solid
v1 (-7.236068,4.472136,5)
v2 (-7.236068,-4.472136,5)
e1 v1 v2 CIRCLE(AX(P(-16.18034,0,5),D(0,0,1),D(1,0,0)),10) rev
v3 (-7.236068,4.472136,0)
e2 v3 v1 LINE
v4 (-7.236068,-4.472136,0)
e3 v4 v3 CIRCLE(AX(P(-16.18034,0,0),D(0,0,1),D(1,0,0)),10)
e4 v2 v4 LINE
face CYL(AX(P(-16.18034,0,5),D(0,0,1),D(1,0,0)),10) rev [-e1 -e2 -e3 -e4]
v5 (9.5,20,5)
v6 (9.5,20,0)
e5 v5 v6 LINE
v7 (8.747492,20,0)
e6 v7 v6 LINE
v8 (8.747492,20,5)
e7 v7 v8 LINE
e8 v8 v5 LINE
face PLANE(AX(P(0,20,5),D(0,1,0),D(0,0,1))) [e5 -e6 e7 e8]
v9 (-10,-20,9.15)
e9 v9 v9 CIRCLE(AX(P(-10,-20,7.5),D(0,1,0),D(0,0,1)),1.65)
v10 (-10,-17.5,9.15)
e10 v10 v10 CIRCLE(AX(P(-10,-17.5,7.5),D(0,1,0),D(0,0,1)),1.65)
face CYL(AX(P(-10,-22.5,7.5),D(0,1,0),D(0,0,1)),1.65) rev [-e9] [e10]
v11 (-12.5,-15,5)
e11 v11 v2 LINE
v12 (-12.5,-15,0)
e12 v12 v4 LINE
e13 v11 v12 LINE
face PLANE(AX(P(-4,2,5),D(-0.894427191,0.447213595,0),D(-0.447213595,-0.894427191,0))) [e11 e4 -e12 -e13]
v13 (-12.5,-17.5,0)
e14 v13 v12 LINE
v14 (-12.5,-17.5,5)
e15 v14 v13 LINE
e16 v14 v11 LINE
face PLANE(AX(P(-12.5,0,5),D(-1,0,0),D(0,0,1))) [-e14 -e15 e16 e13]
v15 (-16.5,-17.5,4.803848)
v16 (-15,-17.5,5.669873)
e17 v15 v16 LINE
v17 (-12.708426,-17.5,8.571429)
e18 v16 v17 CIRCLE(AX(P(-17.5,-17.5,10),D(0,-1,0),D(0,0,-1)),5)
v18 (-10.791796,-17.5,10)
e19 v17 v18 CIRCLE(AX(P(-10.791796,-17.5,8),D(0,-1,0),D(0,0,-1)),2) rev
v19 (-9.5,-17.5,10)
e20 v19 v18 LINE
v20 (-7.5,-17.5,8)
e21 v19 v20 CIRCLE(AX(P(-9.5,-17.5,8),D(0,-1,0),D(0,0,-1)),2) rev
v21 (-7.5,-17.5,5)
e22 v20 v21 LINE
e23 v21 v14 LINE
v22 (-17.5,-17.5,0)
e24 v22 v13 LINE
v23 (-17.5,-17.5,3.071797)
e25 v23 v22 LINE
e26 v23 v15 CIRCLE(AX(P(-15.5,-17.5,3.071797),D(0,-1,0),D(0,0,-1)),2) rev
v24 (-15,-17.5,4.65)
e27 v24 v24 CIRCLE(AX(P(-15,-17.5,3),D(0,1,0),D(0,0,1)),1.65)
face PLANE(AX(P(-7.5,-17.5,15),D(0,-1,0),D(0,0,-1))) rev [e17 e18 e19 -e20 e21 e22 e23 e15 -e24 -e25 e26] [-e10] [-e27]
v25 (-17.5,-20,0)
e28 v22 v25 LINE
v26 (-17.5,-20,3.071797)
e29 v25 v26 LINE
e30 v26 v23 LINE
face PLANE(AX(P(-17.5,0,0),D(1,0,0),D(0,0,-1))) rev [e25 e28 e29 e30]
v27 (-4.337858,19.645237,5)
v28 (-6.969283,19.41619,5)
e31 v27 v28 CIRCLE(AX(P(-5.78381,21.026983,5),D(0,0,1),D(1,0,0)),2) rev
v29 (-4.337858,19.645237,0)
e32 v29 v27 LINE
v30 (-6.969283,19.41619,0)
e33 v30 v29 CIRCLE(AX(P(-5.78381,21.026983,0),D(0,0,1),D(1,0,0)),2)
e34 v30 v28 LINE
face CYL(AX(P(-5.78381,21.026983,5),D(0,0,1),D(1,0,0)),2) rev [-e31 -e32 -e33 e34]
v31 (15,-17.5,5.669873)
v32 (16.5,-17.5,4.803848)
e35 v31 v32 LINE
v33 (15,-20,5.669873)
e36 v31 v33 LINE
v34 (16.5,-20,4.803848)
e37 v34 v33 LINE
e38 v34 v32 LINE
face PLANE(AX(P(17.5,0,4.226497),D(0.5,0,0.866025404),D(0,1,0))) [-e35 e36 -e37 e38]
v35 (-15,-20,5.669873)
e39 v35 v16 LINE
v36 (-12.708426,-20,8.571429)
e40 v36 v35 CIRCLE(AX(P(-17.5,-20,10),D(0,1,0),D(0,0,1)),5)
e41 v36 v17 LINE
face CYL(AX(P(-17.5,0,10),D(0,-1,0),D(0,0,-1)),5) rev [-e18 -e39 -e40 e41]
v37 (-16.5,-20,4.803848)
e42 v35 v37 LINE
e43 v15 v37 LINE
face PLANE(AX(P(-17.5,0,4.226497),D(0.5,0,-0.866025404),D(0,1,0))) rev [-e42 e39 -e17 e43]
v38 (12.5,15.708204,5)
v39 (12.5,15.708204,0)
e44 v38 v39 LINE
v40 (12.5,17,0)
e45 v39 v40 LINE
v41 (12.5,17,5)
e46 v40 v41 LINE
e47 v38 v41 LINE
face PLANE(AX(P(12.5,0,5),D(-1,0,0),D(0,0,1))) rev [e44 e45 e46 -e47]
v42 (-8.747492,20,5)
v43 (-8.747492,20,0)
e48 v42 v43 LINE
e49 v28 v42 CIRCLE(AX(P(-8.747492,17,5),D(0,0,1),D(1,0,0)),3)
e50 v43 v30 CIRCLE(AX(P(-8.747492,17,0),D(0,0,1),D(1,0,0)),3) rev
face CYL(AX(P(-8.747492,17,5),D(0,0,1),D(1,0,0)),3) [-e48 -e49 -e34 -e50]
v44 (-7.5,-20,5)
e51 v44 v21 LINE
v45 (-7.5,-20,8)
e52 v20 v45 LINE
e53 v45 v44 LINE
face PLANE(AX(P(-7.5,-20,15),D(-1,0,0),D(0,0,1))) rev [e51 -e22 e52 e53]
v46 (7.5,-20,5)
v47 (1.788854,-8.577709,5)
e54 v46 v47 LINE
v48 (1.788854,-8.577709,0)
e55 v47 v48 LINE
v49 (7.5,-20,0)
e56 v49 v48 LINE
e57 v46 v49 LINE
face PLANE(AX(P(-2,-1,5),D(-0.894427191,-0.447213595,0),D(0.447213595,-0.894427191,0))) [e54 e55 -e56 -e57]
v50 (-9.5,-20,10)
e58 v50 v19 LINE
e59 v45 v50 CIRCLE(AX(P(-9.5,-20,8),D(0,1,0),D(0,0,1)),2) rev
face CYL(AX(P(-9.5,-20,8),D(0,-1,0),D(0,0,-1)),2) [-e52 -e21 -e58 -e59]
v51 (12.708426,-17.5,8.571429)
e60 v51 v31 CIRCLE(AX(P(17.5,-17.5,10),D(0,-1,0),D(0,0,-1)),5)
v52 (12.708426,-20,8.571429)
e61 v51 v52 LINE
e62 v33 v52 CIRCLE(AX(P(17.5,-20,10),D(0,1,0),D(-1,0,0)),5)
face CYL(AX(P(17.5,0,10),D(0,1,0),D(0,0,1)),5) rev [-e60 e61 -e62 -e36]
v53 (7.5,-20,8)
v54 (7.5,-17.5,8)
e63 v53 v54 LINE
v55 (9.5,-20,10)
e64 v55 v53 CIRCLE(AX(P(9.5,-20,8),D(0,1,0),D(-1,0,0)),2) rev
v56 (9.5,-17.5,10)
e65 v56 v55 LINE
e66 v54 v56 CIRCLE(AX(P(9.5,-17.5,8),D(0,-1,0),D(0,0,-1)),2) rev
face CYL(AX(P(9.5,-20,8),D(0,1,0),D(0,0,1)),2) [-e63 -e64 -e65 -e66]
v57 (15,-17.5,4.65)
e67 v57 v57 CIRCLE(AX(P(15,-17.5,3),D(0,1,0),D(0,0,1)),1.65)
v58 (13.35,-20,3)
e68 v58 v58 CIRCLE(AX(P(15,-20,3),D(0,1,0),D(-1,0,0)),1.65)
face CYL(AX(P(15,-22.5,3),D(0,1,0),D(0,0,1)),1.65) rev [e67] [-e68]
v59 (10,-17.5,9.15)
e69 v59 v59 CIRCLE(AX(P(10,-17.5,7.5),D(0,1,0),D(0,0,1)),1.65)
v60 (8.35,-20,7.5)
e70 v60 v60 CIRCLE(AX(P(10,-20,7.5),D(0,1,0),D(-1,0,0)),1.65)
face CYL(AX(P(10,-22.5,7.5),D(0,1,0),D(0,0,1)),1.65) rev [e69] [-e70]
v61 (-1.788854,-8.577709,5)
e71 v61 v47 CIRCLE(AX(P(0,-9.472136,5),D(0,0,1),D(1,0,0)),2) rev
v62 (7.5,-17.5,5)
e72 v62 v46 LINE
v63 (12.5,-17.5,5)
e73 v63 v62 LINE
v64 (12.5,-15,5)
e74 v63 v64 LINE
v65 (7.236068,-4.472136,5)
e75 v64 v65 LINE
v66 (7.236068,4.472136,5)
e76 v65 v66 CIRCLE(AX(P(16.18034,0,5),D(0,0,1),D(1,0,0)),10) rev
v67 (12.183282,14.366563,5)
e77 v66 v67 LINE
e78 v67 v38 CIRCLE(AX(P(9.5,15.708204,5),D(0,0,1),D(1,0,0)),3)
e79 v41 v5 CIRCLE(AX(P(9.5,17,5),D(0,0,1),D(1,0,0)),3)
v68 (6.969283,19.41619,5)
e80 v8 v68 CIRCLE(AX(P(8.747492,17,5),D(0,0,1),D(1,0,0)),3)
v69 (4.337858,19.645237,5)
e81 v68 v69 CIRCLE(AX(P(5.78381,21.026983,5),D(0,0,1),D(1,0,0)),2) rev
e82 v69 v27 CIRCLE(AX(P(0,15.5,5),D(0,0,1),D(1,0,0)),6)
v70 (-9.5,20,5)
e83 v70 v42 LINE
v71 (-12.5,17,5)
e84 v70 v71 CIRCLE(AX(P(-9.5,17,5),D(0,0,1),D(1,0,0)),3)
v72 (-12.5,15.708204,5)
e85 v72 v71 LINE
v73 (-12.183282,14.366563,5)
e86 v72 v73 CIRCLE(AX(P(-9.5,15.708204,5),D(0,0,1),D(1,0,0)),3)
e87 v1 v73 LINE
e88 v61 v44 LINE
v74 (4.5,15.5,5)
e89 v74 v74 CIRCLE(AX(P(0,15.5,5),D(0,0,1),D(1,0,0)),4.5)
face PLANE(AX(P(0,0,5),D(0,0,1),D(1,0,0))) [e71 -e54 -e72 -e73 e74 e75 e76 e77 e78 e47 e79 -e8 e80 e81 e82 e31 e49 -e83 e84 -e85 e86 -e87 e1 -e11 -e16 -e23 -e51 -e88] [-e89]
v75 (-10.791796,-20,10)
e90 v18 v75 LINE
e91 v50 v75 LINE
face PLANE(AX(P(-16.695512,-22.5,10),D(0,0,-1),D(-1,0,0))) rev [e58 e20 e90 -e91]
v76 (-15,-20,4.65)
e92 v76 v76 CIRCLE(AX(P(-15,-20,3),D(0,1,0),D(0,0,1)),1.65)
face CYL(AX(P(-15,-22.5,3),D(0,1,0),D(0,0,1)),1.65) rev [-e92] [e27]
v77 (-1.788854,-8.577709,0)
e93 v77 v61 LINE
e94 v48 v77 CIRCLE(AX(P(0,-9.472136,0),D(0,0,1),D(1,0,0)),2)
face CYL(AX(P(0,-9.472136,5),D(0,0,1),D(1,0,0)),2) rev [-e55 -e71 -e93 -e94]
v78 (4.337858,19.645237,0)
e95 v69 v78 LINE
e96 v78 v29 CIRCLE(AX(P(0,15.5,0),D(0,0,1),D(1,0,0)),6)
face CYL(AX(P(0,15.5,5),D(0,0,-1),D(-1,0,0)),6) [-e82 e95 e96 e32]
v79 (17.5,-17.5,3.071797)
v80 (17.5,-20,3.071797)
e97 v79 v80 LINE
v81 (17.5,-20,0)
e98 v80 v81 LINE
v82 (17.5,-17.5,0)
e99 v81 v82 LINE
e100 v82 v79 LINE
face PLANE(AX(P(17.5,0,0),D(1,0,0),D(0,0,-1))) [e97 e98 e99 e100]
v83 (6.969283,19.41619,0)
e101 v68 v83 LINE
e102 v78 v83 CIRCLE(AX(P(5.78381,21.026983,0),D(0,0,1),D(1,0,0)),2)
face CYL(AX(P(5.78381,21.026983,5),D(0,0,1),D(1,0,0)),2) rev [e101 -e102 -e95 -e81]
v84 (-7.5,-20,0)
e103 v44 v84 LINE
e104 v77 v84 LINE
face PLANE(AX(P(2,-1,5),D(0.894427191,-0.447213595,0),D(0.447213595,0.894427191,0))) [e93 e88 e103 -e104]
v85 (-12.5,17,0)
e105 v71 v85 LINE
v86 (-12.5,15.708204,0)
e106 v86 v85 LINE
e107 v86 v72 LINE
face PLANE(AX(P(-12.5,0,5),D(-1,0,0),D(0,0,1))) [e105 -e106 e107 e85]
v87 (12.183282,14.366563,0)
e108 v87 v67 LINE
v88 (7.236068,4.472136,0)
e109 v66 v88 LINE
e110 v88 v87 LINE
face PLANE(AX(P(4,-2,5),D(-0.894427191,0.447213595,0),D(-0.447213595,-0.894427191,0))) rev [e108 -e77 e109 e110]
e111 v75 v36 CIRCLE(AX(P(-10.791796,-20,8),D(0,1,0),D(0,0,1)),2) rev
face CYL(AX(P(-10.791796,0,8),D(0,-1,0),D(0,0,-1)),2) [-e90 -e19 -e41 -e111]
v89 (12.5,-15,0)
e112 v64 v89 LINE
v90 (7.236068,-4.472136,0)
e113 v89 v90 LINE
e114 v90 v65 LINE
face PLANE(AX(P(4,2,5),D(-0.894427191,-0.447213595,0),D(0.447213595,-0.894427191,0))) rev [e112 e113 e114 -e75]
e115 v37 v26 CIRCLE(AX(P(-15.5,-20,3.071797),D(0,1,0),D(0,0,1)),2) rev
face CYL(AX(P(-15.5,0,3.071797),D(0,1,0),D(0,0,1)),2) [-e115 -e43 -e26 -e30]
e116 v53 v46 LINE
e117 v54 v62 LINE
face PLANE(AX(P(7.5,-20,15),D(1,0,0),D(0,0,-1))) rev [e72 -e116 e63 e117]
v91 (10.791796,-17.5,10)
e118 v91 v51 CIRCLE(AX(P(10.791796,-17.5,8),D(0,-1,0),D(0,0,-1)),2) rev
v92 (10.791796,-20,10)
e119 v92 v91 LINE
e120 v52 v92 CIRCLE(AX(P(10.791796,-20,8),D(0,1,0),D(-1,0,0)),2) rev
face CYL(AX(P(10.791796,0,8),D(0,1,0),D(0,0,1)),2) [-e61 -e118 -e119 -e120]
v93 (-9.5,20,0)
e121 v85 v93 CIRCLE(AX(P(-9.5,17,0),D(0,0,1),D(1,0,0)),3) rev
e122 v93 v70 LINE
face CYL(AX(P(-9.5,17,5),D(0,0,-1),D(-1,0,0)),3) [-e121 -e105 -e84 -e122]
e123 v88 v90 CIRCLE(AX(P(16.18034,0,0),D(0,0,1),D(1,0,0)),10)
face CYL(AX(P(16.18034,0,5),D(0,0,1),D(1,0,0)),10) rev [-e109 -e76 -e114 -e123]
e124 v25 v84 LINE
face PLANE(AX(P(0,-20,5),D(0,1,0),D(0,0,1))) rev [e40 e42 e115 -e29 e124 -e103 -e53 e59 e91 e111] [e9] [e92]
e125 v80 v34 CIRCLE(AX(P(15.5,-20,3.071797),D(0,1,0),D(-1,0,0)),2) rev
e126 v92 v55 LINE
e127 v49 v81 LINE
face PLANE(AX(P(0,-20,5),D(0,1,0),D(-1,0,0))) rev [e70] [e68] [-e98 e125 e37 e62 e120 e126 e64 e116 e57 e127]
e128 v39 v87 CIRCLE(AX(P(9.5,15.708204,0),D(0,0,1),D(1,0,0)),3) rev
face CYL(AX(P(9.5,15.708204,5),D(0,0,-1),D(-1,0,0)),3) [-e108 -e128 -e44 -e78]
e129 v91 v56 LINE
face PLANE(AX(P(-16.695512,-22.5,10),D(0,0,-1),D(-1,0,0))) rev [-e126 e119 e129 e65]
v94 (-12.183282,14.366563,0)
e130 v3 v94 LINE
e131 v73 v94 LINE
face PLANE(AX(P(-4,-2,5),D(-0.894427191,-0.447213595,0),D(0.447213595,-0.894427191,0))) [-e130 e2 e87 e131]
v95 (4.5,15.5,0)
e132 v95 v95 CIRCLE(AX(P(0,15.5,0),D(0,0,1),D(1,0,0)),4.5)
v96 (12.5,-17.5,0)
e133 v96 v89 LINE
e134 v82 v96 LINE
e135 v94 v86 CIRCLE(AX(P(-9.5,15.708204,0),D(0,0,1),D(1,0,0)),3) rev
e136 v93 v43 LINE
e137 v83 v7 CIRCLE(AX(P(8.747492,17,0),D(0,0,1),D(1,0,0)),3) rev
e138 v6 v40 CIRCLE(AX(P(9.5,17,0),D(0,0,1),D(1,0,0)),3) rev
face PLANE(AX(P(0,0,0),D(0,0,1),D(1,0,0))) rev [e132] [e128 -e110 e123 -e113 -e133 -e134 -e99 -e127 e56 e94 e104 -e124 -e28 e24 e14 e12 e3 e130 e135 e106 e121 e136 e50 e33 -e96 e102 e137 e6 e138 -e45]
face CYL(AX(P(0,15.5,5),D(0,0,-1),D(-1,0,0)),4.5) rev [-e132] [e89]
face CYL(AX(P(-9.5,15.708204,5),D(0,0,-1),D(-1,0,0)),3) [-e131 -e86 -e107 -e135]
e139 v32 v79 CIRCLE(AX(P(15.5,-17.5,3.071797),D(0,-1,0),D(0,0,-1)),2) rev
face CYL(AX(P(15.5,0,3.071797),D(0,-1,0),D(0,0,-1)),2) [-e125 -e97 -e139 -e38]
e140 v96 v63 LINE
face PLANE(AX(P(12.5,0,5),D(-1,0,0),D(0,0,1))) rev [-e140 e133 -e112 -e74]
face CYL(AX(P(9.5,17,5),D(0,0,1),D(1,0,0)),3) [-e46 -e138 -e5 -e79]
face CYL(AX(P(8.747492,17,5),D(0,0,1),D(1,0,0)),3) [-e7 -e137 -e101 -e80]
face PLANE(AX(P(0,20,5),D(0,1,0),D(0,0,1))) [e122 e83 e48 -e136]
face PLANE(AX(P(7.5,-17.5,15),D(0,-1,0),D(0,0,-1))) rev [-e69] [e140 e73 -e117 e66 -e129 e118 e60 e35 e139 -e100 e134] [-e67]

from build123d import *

# Parameters (mm, degrees)
SKETCH1_R           = 4.5
BOSS_EXTRUDE2_DEPTH = 5
SKETCH2_W           = 5
SKETCH2_H           = 2.5
BOSS_EXTRUDE3_DEPTH = 10
SKETCH3_W           = 10
SKETCH3_H           = 2.5
BOSS_EXTRUDE4_DEPTH = 5
SKETCH4_W           = 10
SKETCH4_H           = 2.5
BOSS_EXTRUDE5_DEPTH = 5
SKETCH5_R           = 1.65
CUT_EXTRUDE1_DEPTH  = 5
CHAMFER1_SIZE       = 5.773502692
CHAMFER1_SIZE_2     = 10
FILLET1_R           = 2
FILLET2_R           = 5
FILLET3_R           = 2
FILLET4_R           = 2
FILLET5_R           = 10
FILLET6_R           = 3
SKETCH6_R           = 1.65
SKETCH6_W           = 36.073404507
SKETCH6_H           = 7.954648173
CUT_EXTRUDE2_DEPTH  = 5
FILLET10_R          = 2


with BuildPart() as part:
    # Sketch1 → Boss-Extrude2 (new body)
    with BuildSketch(Plane.XY):
        with BuildLine():
            Line((-7.5, 20), (-5.870329309, 16.740658618))
            ThreePointArc((-5.870329309, 16.740658618), (0, 21.5), (5.870329309, 16.740658618))
            Line((5.870329309, 16.740658618), (7.5, 20))
            Line((7.5, 20), (12.5, 20))
            Line((12.5, 20), (12.5, 15))
            Line((12.5, 15), (5, 0))
            Line((5, 0), (12.5, -15))
            Line((12.5, -15), (12.5, -20))
            Line((12.5, -20), (7.5, -20))
            Line((7.5, -20), (0, -5))
            Line((0, -5), (-7.5, -20))
            Line((-7.5, -20), (-12.5, -20))
            Line((-12.5, -20), (-12.5, -15))
            Line((-12.5, -15), (-5, 0))
            Line((-5, 0), (-12.5, 15))
            Line((-12.5, 15), (-12.5, 20))
            Line((-12.5, 20), (-7.5, 20))
        make_face()
        with Locations((0, 15.5)):
            Circle(SKETCH1_R, mode=Mode.SUBTRACT)
    extrude(amount=BOSS_EXTRUDE2_DEPTH)

    # Sketch2 → Boss-Extrude3 (add)
    with BuildSketch(Plane.XY.offset(5)):
        with Locations((-10, -18.75)):
            Rectangle(SKETCH2_W, SKETCH2_H)
        with Locations((10, -18.75)):
            Rectangle(SKETCH2_W, SKETCH2_H)
    extrude(amount=BOSS_EXTRUDE3_DEPTH)

    # Sketch3 → Boss-Extrude4 (add)
    with BuildSketch(Plane(origin=(12.5, 0, 0), x_dir=(0, 0, -1), z_dir=(1, 0, 0))):
        with Locations((-5, -18.75)):
            Rectangle(SKETCH3_W, SKETCH3_H)
    extrude(amount=BOSS_EXTRUDE4_DEPTH)

    # Sketch4 → Boss-Extrude5 (add)
    with BuildSketch(Plane.ZY.offset(12.5)):
        with Locations((5, -18.75)):
            Rectangle(SKETCH4_W, SKETCH4_H)
    extrude(amount=BOSS_EXTRUDE5_DEPTH)

    # Sketch5 → Cut-Extrude1 (cut)
    with BuildSketch(Plane(origin=(0, -17.5, 0), x_dir=(1, 0, 0), z_dir=(0, 1, 0))):
        with Locations(Location((-15, -3, 0), (0, 0, 270))):
            Circle(SKETCH5_R)
        with Locations(Location((-10, -12, 0), (0, 0, 270))):
            Circle(SKETCH5_R)
        with Locations(Location((10, -12, 0), (0, 0, 270))):
            Circle(SKETCH5_R)
        with Locations(Location((15, -3, 0), (0, 0, 270))):
            Circle(SKETCH5_R)
    extrude(amount=-CUT_EXTRUDE1_DEPTH, mode=Mode.SUBTRACT)

    # Chamfer1
    # the kernel refuses this chamfer: 10, 5.773502692 mm, written as the material it takes off along each edge
    with BuildSketch(Plane(origin=(17.5, -45.870857546, 10), x_dir=(0.05789386240267053, 0, -0.9983227437537926), z_dir=(0, 1, 0))) as chamfer1_piece_1_section:
        Polygon((CHAMFER1_SIZE * 0.998322743736, CHAMFER1_SIZE * 0.0578938624016), (-CHAMFER1_SIZE_2 * 0.0578938624027, CHAMFER1_SIZE_2 * 0.998322743754), (0, 0), align=None)
    chamfer1_piece_1 = extrude(amount=54.241715093, mode=Mode.PRIVATE)
    chamfer1_piece_1 = split(chamfer1_piece_1, bisect_by=Plane(origin=(12.5, -18.75, 7.760588383), z_dir=(1, 0, 0)), keep=Keep.TOP, mode=Mode.PRIVATE)
    add(chamfer1_piece_1, mode=Mode.SUBTRACT)
    with BuildSketch(Plane(origin=(-17.5, -45.870857546, 10), x_dir=(-0.05789386240267053, 0, -0.9983227437537926), z_dir=(0, 1, 0))) as chamfer1_piece_2_section:
        Polygon((CHAMFER1_SIZE * 0.998322743736, -CHAMFER1_SIZE * 0.0578938624016), (-CHAMFER1_SIZE_2 * 0.0578938624027, -CHAMFER1_SIZE_2 * 0.998322743754), (0, 0), align=None)
    chamfer1_piece_2 = extrude(amount=54.241715093, mode=Mode.PRIVATE)
    chamfer1_piece_2 = split(chamfer1_piece_2, bisect_by=Plane(origin=(-12.5, -18.75, 7.760588383), z_dir=(-1, 0, 0)), keep=Keep.TOP, mode=Mode.PRIVATE)
    add(chamfer1_piece_2, mode=Mode.SUBTRACT)

    # Fillet1
    fillet1_edges = [part.edges().sort_by_distance(p)[0] for p in [
        (12.5, -18.75, 15),
        (7.5, -18.75, 15),
        (-7.5, -18.75, 15),
        (-12.5, -18.75, 15),
    ]]
    fillet(fillet1_edges, radius=FILLET1_R)

    # Fillet2
    fillet2_edges = [part.edges().sort_by_distance(p)[0] for p in [
        (12.5, -18.75, 7.113248654),
        (-12.5, -18.75, 7.113248654),
    ]]
    fillet(fillet2_edges, radius=FILLET2_R)

    # Fillet3
    fillet3_edges = [part.edges().sort_by_distance(p)[0] for p in [
        (17.5, -18.75, 4.226497308),
        (-17.5, -18.75, 4.226497308),
    ]]
    fillet(fillet3_edges, radius=FILLET3_R)

    # Fillet4
    # the kernel refuses this fillet: 2 mm, written as the material it adds along each edge
    with BuildSketch(Plane(origin=(-5.870329309, 16.740658618, 0), x_dir=(-0.4472135954999439, 0.894427190999923, 0), z_dir=(0, 0, 1))) as fillet4_piece_1:
        with BuildLine():
            CenterArc((3.795112325, -1.99428722), FILLET4_R, 94.331614503, 105.404093699)
            Line((1.912591774, -2.669651103), (1.874941363, -2.683158381))
            ThreePointArc((1.874941363, -2.683158381), (1.109985705, -1.224719073), (-0.024899799, -0.031304952))
            Line((-0.024899799, -0.031304952), (0, 0.04))
            ThreePointArc((0, 0.04), (1.822027223, 0.04), (3.641033289, 0.039885744))
            Line((3.641033289, 0.039885744), (3.644054446, 0))
        make_face()
    extrude(amount=5)
    with BuildSketch(Plane(origin=(5.870329309, 16.740658618, 0), x_dir=(-0.46663943526551355, 0.8844476454008358, 0), z_dir=(0, 0, 1))) as fillet4_piece_2:
        with BuildLine():
            CenterArc((3.831402307, -1.923646391), FILLET4_R, 105.88286544, 105.404093699)
            Line((2.1222482, -2.962295628), (2.088065118, -2.983068612))
            ThreePointArc((2.088065118, -2.983068612), (1.02860762, -1.504443275), (-0.03251648, -0.023295461))
            Line((-0.03251648, -0.023295461), (0.010946864, 0.038472928))
            ThreePointArc((0.010946864, 0.038472928), (1.64202956, -0.189060828), (3.273112257, 0.038472928))
            Line((3.273112257, 0.038472928), (3.284059121, 0))
        make_face()
    extrude(amount=5)
    with BuildSketch(Plane(origin=(0, -5, 0), x_dir=(-0.4472135954999584, -0.8944271909999157, 0), z_dir=(0, 0, 1))) as fillet4_piece_3:
        with BuildLine():
            CenterArc((FILLET4_R * 2, FILLET4_R), FILLET4_R, 143.130102354, 126.869897646)
            Line((FILLET4_R * 1.2, FILLET4_R * 1.6), (FILLET4_R * 1.184, FILLET4_R * 1.612))
            Line((FILLET4_R * 1.184, FILLET4_R * 1.612), (-FILLET4_R * 0.016, FILLET4_R * 0.012))
            Line((-FILLET4_R * 0.016, FILLET4_R * 0.012), (0, -FILLET4_R * 0.02))
            Line((0, -FILLET4_R * 0.02), (FILLET4_R * 2, -FILLET4_R * 0.02))
            Line((FILLET4_R * 2, -FILLET4_R * 0.02), (FILLET4_R * 2, 0))
        make_face()
    extrude(amount=5)

    # Fillet5
    fillet5_edges = [part.edges().sort_by_distance(p)[0] for p in [
        (5, 0, 2.5),
        (-5, 0, 2.5),
    ]]
    fillet(fillet5_edges, radius=FILLET5_R)

    # Fillet6
    fillet6_edges = [part.edges().sort_by_distance(p)[0] for p in [
        (7.5, 20, 2.5),
        (12.5, 20, 2.5),
        (12.5, 15, 2.5),
        (-12.5, 15, 2.5),
        (-12.5, 20, 2.5),
        (-7.5, 20, 2.5),
    ]]
    fillet(fillet6_edges, radius=FILLET6_R)

    # Sketch6 → Cut-Extrude2 (cut)
    with BuildSketch(Plane(origin=(0, -17.5, 0), x_dir=(1, 0, 0), z_dir=(0, 1, 0))):
        with Locations(Location((-10, -7.5, 0), (0, 0, 270))):
            Circle(SKETCH6_R)
        with Locations(Location((10, -7.5, 0), (0, 0, 270))):
            Circle(SKETCH6_R)
        with Locations((1.341190681, -13.977324087)):
            Rectangle(SKETCH6_W, SKETCH6_H)
    extrude(amount=-CUT_EXTRUDE2_DEPTH, mode=Mode.SUBTRACT)

    # Fillet10
    fillet10_edges = [part.edges().sort_by_distance(p)[0] for p in [
        (12.5, -18.75, 10),
        (-12.5, -18.75, 10),
        (7.5, -18.75, 10),
        (-7.5, -18.75, 10),
    ]]
    fillet(fillet10_edges, radius=FILLET10_R)


solid = part.part
